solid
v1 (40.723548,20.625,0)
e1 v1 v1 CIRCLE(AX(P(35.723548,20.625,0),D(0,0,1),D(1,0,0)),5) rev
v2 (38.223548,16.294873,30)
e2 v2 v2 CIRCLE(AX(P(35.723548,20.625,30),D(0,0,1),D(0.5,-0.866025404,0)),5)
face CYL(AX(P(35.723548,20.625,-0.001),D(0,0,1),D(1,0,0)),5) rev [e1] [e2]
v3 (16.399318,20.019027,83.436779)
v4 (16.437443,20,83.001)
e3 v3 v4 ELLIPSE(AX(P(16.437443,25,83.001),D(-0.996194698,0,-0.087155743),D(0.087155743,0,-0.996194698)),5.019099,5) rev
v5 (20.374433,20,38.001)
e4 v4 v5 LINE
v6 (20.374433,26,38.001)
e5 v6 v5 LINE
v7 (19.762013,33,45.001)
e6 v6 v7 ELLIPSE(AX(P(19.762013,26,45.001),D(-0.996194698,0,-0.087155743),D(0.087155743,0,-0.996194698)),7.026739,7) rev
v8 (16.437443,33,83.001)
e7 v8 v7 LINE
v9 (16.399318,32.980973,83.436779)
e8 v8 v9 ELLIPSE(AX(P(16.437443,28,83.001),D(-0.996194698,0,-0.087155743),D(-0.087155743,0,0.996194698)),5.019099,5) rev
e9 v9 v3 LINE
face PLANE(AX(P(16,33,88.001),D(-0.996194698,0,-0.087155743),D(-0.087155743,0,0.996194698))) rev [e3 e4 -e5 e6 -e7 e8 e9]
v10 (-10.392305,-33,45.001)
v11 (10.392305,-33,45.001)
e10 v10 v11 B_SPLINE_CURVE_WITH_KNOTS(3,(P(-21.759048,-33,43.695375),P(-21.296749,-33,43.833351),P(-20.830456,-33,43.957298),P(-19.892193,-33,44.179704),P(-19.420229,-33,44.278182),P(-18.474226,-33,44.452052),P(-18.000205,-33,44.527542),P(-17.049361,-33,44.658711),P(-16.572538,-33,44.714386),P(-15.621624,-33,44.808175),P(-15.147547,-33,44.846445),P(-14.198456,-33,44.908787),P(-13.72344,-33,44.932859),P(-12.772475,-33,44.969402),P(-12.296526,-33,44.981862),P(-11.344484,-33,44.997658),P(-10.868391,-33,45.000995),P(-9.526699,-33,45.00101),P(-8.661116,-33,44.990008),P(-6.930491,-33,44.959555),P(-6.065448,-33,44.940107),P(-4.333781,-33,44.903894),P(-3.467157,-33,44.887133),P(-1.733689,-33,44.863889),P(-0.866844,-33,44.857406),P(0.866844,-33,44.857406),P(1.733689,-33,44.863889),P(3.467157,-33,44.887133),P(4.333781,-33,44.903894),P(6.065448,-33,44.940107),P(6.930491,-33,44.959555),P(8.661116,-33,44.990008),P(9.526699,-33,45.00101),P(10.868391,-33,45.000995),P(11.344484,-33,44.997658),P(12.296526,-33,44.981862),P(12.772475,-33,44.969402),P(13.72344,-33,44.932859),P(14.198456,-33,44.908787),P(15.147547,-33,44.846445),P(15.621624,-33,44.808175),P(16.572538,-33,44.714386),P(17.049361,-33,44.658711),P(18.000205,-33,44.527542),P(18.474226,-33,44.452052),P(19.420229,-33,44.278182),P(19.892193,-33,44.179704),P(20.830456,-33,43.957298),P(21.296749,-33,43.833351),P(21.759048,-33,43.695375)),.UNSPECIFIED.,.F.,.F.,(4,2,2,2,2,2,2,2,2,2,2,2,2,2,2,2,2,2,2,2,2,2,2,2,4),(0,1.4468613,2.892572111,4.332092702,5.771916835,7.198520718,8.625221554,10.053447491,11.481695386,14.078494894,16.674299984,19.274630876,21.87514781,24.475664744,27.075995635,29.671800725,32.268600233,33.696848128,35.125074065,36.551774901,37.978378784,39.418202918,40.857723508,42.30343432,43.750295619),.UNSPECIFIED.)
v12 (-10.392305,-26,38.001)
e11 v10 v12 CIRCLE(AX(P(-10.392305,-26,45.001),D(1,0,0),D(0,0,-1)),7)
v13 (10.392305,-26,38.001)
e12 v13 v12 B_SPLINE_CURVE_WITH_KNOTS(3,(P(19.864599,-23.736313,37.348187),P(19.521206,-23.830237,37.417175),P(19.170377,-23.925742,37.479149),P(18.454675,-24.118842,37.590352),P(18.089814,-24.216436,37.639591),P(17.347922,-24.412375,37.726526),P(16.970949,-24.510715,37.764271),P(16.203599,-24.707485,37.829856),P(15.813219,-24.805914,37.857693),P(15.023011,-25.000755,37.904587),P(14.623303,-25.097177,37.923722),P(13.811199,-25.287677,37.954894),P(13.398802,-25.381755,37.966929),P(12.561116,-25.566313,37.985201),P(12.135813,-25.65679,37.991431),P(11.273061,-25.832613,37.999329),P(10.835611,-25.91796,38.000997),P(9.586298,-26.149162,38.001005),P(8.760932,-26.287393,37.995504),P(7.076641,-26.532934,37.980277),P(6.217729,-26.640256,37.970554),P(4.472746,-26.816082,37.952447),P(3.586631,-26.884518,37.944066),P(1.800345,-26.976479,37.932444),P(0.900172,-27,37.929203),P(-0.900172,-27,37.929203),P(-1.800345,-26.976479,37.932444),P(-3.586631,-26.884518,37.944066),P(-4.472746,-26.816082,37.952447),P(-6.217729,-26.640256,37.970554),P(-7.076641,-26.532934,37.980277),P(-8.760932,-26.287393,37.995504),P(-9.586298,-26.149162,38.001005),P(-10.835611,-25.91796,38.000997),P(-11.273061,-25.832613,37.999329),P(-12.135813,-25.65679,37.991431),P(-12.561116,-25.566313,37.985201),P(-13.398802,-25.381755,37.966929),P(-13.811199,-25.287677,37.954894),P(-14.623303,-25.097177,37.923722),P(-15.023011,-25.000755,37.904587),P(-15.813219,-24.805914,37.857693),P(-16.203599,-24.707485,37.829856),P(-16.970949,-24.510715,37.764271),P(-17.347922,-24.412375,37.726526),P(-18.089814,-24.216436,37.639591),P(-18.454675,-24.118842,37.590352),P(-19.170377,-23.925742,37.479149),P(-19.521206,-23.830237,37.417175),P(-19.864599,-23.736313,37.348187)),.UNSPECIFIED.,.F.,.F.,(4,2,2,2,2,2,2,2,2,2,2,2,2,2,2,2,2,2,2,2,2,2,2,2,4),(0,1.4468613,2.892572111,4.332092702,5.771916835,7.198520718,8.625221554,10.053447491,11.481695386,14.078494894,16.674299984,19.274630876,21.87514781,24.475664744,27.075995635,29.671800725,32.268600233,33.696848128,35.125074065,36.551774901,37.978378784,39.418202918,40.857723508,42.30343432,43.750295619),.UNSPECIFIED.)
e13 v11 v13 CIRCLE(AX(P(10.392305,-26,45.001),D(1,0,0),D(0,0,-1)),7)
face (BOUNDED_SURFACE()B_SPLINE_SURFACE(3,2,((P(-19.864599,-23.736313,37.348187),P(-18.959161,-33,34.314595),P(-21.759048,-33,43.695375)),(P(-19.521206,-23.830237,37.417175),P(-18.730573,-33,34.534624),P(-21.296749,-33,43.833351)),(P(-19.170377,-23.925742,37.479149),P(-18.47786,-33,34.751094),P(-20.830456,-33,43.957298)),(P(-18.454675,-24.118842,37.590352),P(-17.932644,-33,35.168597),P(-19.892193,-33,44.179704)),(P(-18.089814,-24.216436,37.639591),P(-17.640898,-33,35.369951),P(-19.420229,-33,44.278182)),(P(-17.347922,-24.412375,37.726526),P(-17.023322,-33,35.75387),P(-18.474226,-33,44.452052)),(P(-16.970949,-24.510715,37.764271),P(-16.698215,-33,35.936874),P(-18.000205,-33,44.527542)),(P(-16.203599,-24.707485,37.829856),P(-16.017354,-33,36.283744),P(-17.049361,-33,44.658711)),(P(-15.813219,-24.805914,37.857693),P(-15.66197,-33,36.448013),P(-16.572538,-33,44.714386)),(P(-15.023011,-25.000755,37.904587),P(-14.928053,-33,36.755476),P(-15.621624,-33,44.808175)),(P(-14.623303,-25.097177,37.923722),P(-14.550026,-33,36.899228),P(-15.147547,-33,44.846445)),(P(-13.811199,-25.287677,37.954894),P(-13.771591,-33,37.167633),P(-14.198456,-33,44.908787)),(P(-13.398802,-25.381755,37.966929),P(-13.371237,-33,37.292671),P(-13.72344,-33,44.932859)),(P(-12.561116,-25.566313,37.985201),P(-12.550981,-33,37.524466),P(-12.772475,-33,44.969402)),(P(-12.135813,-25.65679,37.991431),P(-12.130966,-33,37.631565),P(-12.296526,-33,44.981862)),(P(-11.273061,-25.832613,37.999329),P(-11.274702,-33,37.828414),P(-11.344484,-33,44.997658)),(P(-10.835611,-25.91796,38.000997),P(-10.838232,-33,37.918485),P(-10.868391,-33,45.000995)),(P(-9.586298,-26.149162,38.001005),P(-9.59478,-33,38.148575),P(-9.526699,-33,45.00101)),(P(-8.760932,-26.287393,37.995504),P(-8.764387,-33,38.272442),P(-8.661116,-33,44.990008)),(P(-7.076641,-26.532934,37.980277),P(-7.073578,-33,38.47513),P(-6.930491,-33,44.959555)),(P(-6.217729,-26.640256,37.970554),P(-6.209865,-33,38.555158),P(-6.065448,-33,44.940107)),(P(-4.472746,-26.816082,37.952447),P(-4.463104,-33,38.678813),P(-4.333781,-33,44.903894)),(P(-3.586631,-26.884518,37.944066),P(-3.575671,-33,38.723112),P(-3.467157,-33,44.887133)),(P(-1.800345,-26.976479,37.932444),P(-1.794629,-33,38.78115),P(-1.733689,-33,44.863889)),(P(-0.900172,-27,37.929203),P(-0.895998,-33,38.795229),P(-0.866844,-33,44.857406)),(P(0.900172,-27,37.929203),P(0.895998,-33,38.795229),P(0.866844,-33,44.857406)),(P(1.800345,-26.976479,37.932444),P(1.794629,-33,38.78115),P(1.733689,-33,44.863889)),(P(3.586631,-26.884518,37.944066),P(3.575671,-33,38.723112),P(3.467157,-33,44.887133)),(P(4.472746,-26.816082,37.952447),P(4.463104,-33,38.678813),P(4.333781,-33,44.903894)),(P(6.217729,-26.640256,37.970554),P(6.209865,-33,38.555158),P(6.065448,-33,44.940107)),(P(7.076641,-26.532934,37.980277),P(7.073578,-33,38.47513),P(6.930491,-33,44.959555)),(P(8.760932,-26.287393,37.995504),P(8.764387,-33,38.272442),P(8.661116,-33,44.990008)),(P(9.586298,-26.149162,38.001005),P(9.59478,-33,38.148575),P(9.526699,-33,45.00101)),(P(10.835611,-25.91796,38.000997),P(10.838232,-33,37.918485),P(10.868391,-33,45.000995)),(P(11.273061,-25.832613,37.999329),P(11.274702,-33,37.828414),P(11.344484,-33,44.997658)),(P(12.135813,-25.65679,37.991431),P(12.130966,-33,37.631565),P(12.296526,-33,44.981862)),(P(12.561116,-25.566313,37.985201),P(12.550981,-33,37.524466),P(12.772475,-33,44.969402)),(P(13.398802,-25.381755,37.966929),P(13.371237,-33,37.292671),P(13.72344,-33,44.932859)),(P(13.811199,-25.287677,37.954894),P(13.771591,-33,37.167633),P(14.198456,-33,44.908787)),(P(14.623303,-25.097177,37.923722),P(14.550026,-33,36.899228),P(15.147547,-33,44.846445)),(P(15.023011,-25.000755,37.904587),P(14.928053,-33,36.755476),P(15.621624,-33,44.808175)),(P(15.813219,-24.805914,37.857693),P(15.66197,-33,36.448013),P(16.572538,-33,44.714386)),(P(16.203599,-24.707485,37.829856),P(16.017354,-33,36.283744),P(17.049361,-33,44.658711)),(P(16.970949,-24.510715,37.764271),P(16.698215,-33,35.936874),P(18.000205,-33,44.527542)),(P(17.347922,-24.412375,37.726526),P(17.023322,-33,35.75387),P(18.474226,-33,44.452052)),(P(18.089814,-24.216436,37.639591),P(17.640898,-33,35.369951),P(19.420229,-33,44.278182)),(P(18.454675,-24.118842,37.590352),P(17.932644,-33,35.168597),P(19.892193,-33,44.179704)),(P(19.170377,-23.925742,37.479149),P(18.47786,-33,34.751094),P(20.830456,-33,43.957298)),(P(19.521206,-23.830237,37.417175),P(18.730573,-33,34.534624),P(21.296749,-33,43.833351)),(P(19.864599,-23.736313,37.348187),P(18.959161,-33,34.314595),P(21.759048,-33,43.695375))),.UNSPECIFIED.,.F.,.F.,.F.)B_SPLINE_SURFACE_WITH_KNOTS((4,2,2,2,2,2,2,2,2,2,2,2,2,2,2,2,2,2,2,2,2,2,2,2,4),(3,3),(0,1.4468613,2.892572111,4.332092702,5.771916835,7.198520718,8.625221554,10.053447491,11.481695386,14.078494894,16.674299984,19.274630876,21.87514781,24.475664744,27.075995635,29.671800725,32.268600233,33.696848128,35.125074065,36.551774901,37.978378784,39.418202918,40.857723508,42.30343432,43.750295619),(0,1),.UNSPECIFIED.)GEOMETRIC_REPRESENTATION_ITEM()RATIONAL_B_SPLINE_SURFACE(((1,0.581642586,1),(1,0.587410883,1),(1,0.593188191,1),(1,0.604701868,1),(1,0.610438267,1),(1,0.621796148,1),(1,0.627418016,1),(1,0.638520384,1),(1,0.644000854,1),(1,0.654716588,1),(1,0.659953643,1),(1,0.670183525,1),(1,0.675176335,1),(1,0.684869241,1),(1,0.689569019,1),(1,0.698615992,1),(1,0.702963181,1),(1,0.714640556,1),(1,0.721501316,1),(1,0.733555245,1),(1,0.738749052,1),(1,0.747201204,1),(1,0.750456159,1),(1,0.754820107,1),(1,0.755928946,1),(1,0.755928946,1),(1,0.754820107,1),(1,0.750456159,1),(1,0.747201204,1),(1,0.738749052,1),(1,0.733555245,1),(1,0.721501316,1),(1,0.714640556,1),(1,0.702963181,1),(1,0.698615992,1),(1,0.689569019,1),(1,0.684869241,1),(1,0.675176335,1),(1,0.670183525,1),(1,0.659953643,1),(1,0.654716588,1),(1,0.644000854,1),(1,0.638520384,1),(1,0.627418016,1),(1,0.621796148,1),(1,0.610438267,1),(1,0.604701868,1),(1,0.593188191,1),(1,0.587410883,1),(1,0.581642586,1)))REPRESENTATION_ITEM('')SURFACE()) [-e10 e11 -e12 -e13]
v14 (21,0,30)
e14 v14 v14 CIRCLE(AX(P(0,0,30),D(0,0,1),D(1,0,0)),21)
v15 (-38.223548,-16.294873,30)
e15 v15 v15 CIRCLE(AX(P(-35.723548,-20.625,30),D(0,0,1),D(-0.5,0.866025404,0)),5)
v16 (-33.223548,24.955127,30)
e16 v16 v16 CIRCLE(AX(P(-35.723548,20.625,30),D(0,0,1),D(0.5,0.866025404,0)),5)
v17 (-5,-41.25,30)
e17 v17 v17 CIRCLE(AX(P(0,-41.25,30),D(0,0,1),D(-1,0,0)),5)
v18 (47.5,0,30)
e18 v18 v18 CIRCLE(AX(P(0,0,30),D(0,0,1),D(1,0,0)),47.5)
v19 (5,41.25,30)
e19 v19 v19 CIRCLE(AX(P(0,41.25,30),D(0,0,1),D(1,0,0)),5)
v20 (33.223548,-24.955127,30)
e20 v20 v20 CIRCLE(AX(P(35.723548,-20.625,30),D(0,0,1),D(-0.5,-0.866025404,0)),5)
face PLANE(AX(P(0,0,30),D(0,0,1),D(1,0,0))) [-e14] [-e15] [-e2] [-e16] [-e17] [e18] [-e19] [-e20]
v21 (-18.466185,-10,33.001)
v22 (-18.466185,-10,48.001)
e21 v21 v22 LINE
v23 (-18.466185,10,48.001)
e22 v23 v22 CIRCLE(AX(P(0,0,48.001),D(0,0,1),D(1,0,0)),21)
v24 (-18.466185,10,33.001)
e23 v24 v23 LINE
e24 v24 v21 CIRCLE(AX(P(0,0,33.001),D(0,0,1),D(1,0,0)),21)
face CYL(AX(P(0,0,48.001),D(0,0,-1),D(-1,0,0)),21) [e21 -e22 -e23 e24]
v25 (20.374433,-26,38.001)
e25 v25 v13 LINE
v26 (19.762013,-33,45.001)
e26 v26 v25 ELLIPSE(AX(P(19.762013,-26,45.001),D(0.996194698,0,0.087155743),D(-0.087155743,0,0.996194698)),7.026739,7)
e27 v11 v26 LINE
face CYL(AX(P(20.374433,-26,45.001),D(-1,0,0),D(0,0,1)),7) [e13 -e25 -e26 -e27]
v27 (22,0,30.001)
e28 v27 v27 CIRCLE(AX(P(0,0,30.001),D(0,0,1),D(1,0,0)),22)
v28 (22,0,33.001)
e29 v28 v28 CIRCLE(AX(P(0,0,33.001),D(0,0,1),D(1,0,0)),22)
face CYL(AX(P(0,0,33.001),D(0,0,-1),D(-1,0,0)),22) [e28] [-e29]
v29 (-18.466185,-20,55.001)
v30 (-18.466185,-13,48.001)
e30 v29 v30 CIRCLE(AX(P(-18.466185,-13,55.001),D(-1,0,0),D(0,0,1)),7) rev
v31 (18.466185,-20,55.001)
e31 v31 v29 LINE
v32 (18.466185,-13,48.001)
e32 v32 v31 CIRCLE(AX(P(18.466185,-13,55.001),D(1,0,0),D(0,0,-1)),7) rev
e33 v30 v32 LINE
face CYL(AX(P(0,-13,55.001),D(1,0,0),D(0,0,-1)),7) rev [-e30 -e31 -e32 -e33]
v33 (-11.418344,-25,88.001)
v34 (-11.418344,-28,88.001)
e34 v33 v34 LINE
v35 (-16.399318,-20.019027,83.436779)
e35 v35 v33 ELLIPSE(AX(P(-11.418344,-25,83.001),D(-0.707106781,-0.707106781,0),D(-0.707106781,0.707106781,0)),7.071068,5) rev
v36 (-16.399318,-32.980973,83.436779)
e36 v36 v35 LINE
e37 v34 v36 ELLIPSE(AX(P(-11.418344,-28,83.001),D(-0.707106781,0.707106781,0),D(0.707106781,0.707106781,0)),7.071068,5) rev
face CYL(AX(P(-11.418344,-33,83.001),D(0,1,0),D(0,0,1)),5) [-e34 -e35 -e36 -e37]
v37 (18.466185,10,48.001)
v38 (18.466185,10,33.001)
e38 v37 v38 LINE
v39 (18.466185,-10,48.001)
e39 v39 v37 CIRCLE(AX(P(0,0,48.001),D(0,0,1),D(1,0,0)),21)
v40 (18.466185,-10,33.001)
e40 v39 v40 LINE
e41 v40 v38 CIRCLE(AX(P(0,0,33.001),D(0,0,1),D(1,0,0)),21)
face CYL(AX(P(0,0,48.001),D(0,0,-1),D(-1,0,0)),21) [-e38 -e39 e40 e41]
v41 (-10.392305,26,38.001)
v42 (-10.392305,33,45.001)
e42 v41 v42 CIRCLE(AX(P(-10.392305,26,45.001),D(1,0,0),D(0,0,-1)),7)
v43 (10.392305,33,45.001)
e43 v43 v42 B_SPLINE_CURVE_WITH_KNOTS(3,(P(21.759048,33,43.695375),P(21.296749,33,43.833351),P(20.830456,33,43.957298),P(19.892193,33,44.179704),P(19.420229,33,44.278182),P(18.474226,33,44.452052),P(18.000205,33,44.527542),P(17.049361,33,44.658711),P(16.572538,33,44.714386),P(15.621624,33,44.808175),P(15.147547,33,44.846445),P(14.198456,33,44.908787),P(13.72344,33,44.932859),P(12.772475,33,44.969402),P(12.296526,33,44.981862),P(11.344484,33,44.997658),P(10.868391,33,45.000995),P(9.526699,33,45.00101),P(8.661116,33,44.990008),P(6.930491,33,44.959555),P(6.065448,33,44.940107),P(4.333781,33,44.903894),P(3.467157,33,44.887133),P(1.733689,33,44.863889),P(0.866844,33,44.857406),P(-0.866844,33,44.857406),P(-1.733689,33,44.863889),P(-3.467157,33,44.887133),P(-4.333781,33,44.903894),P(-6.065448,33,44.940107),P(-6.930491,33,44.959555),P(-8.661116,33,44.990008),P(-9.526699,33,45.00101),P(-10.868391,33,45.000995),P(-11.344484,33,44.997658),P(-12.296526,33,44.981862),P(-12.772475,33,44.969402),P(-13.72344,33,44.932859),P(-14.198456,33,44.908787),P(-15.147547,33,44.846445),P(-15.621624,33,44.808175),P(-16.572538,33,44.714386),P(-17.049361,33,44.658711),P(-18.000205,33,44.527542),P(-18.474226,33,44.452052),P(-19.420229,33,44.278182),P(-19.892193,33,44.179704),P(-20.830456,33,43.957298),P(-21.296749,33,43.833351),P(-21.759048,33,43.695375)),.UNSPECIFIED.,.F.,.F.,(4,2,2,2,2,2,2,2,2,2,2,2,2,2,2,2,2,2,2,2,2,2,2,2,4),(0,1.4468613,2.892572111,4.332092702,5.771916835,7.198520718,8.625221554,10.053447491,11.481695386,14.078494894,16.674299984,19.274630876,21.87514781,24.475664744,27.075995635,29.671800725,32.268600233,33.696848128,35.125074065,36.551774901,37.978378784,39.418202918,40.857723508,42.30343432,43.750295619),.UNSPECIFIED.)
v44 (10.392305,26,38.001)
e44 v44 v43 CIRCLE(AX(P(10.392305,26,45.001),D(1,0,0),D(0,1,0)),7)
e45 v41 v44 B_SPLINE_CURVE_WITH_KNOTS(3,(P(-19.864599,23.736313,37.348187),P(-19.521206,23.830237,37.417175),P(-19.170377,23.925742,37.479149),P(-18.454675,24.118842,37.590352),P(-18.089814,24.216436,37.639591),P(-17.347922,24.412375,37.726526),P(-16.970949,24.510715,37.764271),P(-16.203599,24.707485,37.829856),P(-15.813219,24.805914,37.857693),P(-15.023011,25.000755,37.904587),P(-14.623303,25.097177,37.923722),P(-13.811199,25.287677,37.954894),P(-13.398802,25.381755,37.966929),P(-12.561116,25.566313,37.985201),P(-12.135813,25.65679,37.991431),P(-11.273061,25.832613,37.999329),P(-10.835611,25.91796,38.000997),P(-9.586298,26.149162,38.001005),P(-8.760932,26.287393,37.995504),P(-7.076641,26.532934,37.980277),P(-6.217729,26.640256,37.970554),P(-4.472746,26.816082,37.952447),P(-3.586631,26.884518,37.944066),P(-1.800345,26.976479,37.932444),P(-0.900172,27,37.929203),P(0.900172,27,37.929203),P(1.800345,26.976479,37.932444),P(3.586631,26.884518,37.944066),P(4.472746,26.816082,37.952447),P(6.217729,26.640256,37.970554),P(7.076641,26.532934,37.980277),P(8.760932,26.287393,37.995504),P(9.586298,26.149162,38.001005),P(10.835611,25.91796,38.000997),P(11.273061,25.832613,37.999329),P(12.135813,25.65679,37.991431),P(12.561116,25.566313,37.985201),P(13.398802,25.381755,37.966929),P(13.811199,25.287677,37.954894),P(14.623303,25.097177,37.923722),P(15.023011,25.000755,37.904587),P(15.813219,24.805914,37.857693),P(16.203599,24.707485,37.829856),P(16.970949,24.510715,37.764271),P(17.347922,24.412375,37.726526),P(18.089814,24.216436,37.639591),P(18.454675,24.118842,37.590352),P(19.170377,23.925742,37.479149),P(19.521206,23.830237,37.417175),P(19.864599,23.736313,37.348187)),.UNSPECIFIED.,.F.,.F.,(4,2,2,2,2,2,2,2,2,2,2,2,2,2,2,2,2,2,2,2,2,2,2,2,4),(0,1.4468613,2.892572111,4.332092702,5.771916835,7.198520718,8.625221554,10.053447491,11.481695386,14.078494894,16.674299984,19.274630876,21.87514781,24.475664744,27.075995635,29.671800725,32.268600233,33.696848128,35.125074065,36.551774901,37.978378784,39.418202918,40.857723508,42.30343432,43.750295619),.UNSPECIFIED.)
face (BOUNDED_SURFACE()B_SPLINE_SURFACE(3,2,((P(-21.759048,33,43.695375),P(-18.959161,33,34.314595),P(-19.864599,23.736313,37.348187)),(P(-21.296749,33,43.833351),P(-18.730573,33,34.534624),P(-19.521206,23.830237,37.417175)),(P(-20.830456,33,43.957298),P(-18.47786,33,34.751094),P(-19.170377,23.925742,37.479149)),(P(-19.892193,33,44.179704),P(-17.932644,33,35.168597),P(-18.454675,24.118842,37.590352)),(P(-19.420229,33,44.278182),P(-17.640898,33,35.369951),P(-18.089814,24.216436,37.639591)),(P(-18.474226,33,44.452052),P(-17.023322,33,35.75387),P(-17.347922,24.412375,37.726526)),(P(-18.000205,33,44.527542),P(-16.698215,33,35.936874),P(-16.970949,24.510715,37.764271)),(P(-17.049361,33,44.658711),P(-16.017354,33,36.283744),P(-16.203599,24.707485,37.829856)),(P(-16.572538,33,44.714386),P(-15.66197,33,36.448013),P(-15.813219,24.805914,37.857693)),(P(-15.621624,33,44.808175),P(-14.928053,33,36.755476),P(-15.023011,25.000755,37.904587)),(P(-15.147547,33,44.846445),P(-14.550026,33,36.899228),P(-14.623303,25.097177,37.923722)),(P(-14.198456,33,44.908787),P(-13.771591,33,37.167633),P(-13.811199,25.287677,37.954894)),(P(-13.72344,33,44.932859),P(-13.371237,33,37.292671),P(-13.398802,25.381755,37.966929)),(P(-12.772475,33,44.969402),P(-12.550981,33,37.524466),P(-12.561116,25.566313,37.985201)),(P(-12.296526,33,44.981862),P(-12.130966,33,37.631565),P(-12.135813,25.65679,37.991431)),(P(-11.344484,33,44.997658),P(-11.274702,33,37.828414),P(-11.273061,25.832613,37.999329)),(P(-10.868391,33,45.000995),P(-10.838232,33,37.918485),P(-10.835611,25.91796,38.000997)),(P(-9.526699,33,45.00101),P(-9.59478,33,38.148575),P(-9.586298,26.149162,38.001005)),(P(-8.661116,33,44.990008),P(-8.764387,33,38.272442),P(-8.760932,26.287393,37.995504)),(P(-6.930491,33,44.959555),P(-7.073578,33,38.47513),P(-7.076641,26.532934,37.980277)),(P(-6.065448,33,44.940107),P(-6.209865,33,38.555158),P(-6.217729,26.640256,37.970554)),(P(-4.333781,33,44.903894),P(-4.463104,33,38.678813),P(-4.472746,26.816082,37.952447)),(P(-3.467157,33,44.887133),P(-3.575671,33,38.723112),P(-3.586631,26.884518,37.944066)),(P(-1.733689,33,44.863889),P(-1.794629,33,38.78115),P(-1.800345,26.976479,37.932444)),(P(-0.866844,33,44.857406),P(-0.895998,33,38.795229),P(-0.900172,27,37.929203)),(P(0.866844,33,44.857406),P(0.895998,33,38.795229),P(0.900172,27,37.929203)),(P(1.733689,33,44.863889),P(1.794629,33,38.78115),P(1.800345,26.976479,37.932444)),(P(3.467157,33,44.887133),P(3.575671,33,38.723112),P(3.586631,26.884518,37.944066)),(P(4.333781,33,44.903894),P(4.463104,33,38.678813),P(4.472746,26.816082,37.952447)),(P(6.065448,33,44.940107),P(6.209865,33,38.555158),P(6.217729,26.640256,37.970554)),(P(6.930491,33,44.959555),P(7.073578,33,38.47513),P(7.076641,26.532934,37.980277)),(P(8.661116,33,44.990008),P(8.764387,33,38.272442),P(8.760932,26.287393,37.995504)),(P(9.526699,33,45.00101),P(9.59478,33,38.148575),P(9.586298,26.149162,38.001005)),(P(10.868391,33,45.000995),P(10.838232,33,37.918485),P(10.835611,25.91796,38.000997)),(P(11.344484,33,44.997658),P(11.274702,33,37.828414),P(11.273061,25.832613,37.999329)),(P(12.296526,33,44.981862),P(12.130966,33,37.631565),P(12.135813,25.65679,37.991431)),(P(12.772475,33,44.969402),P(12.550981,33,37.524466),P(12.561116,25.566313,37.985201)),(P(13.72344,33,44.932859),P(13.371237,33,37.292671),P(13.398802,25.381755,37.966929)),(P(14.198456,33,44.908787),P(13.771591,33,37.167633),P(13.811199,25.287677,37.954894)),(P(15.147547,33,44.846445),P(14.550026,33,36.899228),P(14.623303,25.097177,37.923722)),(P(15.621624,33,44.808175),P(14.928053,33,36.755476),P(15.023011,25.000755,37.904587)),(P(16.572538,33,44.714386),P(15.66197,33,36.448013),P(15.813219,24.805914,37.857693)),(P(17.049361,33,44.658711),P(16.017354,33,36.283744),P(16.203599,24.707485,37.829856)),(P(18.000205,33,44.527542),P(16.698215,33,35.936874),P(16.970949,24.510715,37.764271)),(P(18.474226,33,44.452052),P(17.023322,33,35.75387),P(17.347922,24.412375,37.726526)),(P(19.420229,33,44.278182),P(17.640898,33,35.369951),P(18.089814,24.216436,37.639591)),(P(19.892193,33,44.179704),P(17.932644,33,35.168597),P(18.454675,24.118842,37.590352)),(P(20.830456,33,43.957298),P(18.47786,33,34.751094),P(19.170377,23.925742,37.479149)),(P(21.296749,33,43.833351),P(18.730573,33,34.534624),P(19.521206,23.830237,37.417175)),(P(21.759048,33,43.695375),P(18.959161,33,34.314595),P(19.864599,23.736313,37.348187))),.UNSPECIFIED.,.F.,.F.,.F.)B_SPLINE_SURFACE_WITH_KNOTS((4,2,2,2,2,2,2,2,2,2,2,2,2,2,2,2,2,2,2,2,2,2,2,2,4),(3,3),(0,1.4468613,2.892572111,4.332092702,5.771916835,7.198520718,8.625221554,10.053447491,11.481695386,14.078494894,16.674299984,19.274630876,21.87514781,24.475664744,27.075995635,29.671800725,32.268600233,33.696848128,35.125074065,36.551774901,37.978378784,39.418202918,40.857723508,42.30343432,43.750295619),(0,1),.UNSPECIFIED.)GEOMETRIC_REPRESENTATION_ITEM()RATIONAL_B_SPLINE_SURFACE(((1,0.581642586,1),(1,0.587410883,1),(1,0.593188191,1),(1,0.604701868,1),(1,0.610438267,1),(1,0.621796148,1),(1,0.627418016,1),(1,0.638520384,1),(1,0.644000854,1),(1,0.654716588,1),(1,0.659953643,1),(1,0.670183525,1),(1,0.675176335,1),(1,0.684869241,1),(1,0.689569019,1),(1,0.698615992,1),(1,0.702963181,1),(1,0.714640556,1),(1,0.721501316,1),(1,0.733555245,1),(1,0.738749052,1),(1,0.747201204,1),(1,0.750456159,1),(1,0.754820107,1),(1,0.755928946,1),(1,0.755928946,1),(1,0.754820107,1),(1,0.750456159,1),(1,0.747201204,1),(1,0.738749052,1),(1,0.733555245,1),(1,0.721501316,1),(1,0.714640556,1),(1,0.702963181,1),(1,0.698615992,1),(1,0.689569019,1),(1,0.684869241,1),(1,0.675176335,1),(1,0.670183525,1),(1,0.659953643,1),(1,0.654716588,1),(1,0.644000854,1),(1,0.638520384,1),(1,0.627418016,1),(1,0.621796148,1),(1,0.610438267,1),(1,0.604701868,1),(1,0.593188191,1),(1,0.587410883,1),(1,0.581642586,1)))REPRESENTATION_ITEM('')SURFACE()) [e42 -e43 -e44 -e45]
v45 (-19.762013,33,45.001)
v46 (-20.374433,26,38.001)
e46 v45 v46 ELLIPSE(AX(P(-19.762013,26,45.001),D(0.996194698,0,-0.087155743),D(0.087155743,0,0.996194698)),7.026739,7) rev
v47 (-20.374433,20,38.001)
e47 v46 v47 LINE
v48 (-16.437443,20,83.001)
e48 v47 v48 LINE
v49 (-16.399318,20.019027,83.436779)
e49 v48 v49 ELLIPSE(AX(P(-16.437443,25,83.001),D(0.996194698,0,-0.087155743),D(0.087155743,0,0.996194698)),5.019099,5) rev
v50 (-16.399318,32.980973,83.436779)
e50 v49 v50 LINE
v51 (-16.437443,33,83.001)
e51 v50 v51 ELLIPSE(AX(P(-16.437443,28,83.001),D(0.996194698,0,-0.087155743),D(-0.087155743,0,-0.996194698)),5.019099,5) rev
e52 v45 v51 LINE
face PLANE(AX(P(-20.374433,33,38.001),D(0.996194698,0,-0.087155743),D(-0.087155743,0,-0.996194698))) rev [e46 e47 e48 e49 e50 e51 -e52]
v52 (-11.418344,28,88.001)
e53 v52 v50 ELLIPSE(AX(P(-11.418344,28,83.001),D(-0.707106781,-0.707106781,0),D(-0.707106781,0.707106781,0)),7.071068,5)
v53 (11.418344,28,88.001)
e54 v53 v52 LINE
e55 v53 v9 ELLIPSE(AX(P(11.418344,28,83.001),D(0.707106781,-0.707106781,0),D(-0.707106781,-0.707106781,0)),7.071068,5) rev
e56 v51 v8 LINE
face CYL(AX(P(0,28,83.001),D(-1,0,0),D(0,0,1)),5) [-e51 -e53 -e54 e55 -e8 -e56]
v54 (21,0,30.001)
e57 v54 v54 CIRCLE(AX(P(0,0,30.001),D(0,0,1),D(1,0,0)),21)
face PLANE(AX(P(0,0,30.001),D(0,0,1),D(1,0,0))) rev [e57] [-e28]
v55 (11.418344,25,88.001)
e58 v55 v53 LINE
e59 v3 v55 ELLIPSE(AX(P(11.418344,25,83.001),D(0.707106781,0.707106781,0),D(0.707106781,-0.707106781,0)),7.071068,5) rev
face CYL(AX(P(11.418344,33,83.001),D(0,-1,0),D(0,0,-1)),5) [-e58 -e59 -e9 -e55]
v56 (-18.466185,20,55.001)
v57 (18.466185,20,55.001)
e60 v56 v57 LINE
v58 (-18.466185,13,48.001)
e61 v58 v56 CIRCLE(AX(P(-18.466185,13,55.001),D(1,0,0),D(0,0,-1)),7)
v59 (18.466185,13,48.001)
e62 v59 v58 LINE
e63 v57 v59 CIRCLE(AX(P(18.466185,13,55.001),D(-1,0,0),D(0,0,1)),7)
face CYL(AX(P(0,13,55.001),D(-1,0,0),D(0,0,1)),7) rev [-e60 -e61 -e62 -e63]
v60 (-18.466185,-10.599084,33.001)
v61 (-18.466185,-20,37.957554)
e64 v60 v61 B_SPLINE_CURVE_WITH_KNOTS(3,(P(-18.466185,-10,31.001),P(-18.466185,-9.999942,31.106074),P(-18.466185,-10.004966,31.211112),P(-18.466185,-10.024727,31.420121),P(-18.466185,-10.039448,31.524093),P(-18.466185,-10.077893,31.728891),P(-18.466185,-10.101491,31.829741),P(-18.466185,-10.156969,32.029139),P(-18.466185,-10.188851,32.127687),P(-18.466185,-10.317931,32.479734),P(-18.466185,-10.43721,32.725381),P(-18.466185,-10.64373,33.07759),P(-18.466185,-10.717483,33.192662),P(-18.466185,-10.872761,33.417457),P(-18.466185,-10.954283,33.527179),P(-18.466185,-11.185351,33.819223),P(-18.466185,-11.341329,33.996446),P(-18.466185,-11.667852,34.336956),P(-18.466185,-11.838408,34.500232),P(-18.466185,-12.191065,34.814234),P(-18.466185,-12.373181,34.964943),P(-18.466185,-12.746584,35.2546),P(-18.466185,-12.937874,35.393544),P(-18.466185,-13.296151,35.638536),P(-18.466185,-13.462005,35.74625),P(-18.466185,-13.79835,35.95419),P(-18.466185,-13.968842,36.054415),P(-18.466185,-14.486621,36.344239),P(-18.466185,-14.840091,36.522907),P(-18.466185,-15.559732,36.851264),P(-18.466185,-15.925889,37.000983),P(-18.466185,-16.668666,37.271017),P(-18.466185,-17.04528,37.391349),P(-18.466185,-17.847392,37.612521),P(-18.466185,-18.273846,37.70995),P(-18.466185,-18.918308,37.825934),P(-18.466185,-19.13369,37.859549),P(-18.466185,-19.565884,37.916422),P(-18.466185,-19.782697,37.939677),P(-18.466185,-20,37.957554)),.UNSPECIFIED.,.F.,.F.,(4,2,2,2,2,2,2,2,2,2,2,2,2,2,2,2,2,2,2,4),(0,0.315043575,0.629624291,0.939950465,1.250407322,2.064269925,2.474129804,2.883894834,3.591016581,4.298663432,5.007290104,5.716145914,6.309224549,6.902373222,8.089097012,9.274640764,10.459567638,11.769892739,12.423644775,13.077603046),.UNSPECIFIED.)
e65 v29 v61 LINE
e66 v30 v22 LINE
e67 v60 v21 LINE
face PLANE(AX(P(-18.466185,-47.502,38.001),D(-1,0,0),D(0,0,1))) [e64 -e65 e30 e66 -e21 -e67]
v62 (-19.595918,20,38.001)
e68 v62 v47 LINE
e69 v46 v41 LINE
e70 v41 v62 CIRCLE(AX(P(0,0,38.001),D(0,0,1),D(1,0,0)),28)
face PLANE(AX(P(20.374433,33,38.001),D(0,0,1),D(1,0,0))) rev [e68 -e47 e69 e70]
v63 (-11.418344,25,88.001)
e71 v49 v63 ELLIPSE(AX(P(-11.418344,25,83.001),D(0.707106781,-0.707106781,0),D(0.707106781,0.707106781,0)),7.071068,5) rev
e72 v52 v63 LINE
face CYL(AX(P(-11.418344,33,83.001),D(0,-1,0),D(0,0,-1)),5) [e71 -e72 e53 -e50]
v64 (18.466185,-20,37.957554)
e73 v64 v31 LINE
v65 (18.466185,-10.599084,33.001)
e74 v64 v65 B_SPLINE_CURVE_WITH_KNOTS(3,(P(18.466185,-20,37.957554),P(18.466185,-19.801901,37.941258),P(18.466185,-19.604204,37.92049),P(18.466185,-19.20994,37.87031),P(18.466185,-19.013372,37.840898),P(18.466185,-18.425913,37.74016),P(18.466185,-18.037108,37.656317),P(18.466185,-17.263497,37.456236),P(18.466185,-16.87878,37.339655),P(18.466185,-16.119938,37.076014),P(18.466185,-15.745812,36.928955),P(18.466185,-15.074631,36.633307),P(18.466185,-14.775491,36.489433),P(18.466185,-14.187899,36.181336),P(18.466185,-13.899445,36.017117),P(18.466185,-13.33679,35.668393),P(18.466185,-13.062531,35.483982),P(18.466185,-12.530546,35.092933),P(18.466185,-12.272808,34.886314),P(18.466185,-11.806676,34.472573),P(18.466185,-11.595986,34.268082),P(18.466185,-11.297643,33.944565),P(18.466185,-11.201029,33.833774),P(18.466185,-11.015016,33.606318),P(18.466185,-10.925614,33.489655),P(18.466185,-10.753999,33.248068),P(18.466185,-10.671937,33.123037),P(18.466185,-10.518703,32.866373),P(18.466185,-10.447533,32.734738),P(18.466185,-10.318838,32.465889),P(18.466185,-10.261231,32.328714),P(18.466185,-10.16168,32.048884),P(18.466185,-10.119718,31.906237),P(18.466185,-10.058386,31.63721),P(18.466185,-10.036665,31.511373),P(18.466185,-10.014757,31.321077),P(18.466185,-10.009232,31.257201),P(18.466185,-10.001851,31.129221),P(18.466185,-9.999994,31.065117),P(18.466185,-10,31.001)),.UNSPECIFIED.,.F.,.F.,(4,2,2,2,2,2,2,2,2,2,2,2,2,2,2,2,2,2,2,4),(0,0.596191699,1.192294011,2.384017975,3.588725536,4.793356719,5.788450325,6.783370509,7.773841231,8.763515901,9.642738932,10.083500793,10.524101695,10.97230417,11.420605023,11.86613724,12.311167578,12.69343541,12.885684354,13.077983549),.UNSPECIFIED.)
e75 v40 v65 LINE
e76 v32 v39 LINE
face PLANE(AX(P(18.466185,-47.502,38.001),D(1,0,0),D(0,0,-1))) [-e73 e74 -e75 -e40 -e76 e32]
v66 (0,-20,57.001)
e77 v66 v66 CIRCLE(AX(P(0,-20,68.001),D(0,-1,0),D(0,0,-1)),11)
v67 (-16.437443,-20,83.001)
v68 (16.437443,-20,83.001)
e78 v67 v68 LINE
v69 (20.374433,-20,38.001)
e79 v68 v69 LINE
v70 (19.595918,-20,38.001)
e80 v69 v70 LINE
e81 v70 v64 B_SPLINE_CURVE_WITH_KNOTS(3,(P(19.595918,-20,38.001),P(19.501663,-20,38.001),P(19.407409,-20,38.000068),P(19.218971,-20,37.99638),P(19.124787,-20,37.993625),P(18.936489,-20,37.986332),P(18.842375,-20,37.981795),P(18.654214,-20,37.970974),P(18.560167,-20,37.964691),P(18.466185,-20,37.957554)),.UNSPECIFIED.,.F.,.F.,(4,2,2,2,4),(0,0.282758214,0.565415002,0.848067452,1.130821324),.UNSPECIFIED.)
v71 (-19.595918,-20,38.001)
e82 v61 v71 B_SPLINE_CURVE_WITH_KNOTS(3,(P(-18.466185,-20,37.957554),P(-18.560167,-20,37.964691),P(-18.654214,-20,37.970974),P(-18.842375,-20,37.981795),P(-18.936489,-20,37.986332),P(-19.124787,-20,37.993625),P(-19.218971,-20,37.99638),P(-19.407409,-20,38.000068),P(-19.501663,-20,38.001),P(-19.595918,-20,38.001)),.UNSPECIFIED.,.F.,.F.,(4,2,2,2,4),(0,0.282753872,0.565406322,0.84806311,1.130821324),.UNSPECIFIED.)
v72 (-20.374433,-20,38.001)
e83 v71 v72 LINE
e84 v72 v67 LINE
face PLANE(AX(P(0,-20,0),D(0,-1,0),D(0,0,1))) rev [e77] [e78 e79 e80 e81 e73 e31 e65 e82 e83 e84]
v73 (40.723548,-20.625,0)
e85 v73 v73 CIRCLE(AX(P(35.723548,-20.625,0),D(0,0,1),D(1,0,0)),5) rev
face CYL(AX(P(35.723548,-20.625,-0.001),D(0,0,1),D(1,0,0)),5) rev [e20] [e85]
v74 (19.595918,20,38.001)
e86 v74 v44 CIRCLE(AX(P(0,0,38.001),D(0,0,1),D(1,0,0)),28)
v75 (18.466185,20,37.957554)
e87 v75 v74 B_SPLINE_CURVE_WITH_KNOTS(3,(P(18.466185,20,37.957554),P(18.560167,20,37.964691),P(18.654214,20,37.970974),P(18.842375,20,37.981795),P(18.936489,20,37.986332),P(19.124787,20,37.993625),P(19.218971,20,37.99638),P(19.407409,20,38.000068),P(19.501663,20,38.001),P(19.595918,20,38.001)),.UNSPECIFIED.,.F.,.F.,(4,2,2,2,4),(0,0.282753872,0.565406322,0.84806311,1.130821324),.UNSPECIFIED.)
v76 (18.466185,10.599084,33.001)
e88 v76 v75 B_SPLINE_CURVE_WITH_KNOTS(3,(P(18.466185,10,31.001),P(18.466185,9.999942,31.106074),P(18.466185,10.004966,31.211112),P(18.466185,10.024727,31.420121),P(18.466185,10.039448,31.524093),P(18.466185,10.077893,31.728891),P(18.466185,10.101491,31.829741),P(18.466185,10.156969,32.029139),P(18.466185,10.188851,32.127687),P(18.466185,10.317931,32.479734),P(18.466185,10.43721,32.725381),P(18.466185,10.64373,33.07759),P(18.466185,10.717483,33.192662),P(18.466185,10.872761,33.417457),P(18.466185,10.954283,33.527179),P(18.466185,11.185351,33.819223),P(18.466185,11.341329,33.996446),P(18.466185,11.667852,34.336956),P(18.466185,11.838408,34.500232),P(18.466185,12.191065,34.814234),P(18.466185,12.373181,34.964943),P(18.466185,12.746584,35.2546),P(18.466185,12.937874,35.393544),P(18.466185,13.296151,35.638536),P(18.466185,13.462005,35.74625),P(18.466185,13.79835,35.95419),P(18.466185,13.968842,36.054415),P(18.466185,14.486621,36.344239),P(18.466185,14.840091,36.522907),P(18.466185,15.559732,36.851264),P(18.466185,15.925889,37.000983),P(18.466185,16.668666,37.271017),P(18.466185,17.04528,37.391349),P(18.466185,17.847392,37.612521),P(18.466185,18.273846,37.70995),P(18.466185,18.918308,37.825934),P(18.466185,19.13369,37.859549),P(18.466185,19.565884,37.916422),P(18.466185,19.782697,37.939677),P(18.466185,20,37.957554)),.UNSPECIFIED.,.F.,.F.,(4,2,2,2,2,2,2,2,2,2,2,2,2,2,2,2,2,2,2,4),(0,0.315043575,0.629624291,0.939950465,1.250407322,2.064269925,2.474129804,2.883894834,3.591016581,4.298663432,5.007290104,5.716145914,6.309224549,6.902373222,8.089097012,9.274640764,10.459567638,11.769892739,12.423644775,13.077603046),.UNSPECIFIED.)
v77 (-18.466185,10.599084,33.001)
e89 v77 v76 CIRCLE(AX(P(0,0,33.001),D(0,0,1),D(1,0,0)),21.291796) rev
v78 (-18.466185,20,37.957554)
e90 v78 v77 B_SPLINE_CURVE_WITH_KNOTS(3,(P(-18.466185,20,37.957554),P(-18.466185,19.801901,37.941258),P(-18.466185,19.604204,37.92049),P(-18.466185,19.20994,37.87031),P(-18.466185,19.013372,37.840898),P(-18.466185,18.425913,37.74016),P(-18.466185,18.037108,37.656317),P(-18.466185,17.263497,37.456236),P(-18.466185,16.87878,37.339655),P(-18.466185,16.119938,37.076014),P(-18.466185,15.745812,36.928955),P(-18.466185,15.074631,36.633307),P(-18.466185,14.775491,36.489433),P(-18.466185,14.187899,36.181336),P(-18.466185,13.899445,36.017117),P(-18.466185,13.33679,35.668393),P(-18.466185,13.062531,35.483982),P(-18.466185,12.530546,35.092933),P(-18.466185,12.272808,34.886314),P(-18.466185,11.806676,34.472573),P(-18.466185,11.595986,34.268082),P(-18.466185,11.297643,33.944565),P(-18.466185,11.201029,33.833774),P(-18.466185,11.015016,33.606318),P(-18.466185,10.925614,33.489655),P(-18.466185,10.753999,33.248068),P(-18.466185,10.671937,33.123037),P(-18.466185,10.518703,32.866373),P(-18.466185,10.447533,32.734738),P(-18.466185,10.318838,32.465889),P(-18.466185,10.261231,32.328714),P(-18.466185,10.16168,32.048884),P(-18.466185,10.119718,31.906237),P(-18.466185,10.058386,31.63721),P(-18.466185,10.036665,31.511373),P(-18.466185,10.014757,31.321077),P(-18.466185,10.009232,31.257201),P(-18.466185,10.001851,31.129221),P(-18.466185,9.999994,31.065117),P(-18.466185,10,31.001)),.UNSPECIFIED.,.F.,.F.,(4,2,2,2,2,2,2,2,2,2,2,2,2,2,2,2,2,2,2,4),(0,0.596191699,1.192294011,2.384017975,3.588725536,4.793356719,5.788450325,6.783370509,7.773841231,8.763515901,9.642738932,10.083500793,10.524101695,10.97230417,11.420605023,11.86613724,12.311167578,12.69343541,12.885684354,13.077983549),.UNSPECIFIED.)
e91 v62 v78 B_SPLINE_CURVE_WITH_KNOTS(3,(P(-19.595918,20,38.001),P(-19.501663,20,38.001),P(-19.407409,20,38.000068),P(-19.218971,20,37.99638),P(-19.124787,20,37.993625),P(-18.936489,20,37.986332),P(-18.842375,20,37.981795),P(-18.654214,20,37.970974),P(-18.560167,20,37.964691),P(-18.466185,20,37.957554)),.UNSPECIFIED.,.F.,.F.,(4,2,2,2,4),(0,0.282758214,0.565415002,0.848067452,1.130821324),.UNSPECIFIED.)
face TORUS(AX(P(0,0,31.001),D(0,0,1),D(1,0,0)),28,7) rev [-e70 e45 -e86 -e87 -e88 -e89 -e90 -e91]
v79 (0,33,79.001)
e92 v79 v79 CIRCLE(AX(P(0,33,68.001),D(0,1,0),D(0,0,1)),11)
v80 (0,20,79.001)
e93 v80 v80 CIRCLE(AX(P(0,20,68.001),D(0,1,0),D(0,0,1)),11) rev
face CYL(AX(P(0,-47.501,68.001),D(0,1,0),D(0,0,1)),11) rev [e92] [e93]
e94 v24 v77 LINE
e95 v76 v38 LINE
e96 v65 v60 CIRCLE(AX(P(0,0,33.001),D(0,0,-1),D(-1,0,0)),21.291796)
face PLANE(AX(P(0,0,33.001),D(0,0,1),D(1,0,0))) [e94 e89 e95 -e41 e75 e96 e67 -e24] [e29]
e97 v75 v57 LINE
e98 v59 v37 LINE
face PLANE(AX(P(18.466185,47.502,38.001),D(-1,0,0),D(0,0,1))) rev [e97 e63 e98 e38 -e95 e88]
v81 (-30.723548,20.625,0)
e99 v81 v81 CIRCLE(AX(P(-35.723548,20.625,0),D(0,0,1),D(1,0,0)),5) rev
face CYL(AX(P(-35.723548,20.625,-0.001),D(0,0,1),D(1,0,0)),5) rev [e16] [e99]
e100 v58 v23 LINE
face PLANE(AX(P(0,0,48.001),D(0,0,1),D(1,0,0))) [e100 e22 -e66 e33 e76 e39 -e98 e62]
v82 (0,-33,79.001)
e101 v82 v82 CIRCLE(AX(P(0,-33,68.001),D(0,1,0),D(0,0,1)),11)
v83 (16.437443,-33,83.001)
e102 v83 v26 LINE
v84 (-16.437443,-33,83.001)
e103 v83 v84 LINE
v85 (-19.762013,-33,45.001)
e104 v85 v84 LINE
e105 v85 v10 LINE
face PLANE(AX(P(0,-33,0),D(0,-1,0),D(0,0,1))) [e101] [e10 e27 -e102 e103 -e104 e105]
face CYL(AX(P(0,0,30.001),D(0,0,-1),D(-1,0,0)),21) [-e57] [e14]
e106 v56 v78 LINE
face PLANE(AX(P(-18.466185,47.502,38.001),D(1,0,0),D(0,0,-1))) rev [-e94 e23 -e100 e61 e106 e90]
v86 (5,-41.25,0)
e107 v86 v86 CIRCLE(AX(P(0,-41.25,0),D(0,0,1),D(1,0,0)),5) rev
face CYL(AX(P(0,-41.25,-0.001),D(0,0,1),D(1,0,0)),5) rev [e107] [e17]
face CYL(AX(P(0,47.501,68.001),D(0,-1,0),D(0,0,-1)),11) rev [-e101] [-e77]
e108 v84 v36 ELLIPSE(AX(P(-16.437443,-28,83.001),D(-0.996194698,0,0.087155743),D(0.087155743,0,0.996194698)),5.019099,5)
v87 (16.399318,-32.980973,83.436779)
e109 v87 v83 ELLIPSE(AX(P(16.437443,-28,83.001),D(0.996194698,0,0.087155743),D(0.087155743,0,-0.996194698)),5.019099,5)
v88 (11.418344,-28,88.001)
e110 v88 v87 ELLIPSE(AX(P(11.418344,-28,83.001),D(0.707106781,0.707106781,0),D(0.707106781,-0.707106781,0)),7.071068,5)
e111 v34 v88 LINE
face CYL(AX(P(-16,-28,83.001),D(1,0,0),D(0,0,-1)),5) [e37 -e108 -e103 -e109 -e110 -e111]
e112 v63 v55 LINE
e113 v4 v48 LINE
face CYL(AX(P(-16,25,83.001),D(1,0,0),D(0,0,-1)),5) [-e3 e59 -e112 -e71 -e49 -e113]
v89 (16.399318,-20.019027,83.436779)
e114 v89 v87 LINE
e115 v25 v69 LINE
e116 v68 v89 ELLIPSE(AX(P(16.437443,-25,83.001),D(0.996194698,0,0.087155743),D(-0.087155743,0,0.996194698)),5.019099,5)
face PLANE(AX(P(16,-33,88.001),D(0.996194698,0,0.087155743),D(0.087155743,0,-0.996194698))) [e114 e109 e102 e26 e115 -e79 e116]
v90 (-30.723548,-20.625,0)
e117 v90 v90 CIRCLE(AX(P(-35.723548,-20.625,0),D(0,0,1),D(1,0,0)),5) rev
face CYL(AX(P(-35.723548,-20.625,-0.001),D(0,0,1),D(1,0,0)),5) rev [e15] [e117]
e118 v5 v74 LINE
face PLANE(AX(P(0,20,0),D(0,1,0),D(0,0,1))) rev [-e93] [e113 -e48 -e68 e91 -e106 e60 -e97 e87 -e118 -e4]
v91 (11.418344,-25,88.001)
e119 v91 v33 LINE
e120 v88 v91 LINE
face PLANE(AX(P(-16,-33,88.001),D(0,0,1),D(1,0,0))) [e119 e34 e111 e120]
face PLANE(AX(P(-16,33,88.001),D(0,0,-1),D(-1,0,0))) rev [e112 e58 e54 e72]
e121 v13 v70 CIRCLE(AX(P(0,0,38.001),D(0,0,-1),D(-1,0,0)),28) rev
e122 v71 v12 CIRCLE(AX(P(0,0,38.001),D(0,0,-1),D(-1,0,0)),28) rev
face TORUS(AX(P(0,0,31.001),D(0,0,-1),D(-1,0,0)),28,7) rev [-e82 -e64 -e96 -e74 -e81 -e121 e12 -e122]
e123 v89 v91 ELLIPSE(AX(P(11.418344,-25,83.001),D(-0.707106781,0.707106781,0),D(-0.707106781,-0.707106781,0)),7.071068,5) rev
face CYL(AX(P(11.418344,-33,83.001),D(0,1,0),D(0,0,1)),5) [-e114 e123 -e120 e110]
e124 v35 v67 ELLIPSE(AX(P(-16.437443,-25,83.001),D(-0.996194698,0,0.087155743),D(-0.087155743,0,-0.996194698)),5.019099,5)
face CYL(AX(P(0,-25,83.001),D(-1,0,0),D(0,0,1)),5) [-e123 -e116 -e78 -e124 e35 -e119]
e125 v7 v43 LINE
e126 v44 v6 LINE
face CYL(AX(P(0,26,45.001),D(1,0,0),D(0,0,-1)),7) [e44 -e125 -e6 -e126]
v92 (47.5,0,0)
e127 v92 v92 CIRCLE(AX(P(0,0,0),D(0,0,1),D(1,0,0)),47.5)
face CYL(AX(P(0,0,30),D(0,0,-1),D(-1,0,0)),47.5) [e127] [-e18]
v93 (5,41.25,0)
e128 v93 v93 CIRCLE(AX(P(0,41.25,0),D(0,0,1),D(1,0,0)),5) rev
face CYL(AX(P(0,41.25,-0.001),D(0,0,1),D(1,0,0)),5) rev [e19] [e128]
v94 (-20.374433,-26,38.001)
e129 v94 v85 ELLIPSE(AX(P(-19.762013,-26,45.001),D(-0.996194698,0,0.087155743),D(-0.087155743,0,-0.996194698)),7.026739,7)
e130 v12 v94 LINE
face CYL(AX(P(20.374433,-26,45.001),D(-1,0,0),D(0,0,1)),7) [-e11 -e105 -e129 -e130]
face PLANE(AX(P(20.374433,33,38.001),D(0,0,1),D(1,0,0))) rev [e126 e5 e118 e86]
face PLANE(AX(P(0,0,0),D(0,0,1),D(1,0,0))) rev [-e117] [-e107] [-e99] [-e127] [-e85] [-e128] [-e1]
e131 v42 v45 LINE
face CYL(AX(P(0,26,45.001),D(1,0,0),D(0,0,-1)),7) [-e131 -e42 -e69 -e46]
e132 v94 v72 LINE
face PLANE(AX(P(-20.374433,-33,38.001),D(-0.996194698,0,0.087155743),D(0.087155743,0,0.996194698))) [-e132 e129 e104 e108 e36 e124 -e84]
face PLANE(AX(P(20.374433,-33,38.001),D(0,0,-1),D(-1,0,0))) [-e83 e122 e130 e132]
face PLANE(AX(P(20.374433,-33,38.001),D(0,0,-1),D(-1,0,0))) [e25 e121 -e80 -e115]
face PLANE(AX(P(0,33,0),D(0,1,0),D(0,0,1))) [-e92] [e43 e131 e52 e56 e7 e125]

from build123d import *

# Parameters (mm, degrees)
SZKIC1_R                    = 47.5
DODANIE_WYCI_GNI_CIE1_DEPTH = 30
WYTNIJ_WYCI_GNI_CIE1_REACH  = 75.57
SZKIC2_R                    = 5
SZYK_KO_OWY1_COUNT          = 6
SZKIC3_R                    = 21
DODANIE_WYCI_GNI_CIE2_DEPTH = 0.001
SZKIC5_R                    = 22
DODANIE_WYCI_GNI_CIE4_DEPTH = 3
SZKIC7_R                    = 21
DODANIE_WYCI_GNI_CIE5_DEPTH = 15
DODANIE_WYCI_GNI_CIE6_DEPTH = 6.5
SZKIC14_W                   = 36.932370626
SZKIC14_H                   = 10
DODANIE_WYCI_GNI_CIE7_DEPTH = 10
ZAOKR_GLENIE1_R             = 7
ZAOKR_GLENIE2_R             = 7
ZAOKR_GLENIE3_R             = 5
WYTNIJ_WYCI_GNI_CIE2_REACH  = 130.377
SZKIC16_R                   = 11


# Read off the part's stored shape, not the designer's step: Lustro1
with BuildPart() as part:
    # Szkic1 → Dodanie-wyciągnięcie1 (new body)
    with BuildSketch(Plane.XY):
        Circle(SZKIC1_R)
    extrude(amount=DODANIE_WYCI_GNI_CIE1_DEPTH)

    # Szkic2 → Wytnij-wyciągnięcie1 (cut, up to next)
    with BuildSketch(Plane.XY.offset(30), mode=Mode.PRIVATE) as wytnij_wyci_gni_cie1_sk1:
        with Locations((0, 41.25)):
            Circle(SZKIC2_R)
    wytnij_wyci_gni_cie1_tool1 = extrude(wytnij_wyci_gni_cie1_sk1.sketch, amount=-WYTNIJ_WYCI_GNI_CIE1_REACH, mode=Mode.PRIVATE) & part.part
    wytnij_wyci_gni_cie1 = wytnij_wyci_gni_cie1_tool1.solids().sort_by_distance((0, 41.25, 30))[0]
    add(wytnij_wyci_gni_cie1, mode=Mode.SUBTRACT)

    # Szyk kołowy1: Wytnij-wyciągnięcie1 ×6 about axis
    szyk_ko_owy1_axis = Axis((0, 0, 0), (0, 0, 1))
    for i in range(1, SZYK_KO_OWY1_COUNT):
        add(wytnij_wyci_gni_cie1.rotate(szyk_ko_owy1_axis, i * 360 / SZYK_KO_OWY1_COUNT), mode=Mode.SUBTRACT)

    # Szkic3 → Dodanie-wyciągnięcie2 (add)
    with BuildSketch(Plane.XY.offset(30)):
        Circle(SZKIC3_R)
    extrude(amount=DODANIE_WYCI_GNI_CIE2_DEPTH)

    # Szkic5 → Dodanie-wyciągnięcie4 (add)
    with BuildSketch(Plane.XY.offset(30.001)):
        Circle(SZKIC5_R)
    extrude(amount=DODANIE_WYCI_GNI_CIE4_DEPTH)

    # Szkic7 → Dodanie-wyciągnięcie5 (add)
    with BuildSketch(Plane.XY.offset(33.001)):
        Circle(SZKIC7_R)
    extrude(amount=DODANIE_WYCI_GNI_CIE5_DEPTH)

    # Szkic9 → Dodanie-wyciągnięcie6 (add, symmetric)
    with BuildSketch(Plane(origin=(0, 26.5, 0), x_dir=(1, 0, 0), z_dir=(0, 1, 0))):
        Polygon((-20.374433176, -38.001), (-16, -88.001), (16, -88.001), (20.374433176, -38.001), align=None)
    extrude(amount=DODANIE_WYCI_GNI_CIE6_DEPTH, both=True)

    # Szkic14 → Dodanie-wyciągnięcie7 (add)
    with BuildSketch(Plane(origin=(0, 10, 0), x_dir=(1, 0, 0), z_dir=(0, 1, 0))):
        with Locations((0, -43.001)):
            Rectangle(SZKIC14_W, SZKIC14_H)
    extrude(amount=DODANIE_WYCI_GNI_CIE7_DEPTH)

    # Zaokrąglenie1
    # the kernel refuses this fillet: 7 mm, written as the material it adds along each edge
    with BuildSketch(Plane(origin=(0, 0, 38.001), x_dir=(-0.9435381877974668, -0.33126377430662785, 0), z_dir=(0.33126377430662785, -0.9435381877974668, 0))) as zaokr_glenie1_piece_1_section:
        with BuildLine():
            CenterArc((21 + ZAOKR_GLENIE1_R, ZAOKR_GLENIE1_R), ZAOKR_GLENIE1_R, 180, 90)
            Line((21 + ZAOKR_GLENIE1_R, 0), (21, 0))
            Line((21, 0), (21, ZAOKR_GLENIE1_R))
        make_face()
    zaokr_glenie1_piece_1 = revolve(axis=Axis((0, 0, 38.001), (0, 0, -1)), revolution_arc=218.690998802, mode=Mode.PRIVATE)
    zaokr_glenie1_piece_1 = split(zaokr_glenie1_piece_1, bisect_by=Plane(origin=(-18.694483681, 20, 37.992305912), z_dir=(0, 1, 0)), keep=Keep.TOP, mode=Mode.PRIVATE)
    add(zaokr_glenie1_piece_1)
    with BuildSketch(Plane(origin=(0, 0, 38.001), x_dir=(-0.9435381877974668, -0.33126377430662785, 0), z_dir=(0.33126377430662785, -0.9435381877974668, 0))) as zaokr_glenie1_piece_2_section:
        with BuildLine():
            CenterArc((21 + ZAOKR_GLENIE1_R, ZAOKR_GLENIE1_R), ZAOKR_GLENIE1_R, 180, 90)
            Line((21 + ZAOKR_GLENIE1_R, 0), (21, 0))
            Line((21, 0), (21, ZAOKR_GLENIE1_R))
        make_face()
    zaokr_glenie1_piece_2 = revolve(axis=Axis((0, 0, 38.001), (0, 0, -1)), revolution_arc=218.690998802, mode=Mode.PRIVATE)
    zaokr_glenie1_piece_2 = split(zaokr_glenie1_piece_2, bisect_by=Plane(origin=(-18.466185313, 16.543060956, 36.276393693), z_dir=(1, 0, 0)), keep=Keep.TOP, mode=Mode.PRIVATE)
    zaokr_glenie1_piece_2 = split(zaokr_glenie1_piece_2, bisect_by=Plane(origin=(18.466185313, 16.543060956, 36.276393693), z_dir=(-1, 0, 0)), keep=Keep.TOP, mode=Mode.PRIVATE)
    add(zaokr_glenie1_piece_2)
    with BuildSketch(Plane(origin=(18.466185313, 20, 48.001), x_dir=(0, 0, 1), z_dir=(-1, 0, 0))) as zaokr_glenie1_piece_3:
        with BuildLine():
            CenterArc((ZAOKR_GLENIE1_R, -ZAOKR_GLENIE1_R), ZAOKR_GLENIE1_R, 90, 90)
            Line((0, -ZAOKR_GLENIE1_R), (0, 0))
            Line((0, 0), (ZAOKR_GLENIE1_R, 0))
        make_face()
    extrude(amount=36.932370625)

    # Zaokrąglenie2
    zaokr_glenie2_edges = [part.edges().sort_by_distance(p)[0] for p in [
        (0, 33, 38.001),
    ]]
    fillet(zaokr_glenie2_edges, radius=ZAOKR_GLENIE2_R)

    # Zaokrąglenie3
    zaokr_glenie3_edges = [part.edges().sort_by_distance(p)[0] for p in [
        (0, 20, 88.001),
        (-16, 26.5, 88.001),
        (16, 26.5, 88.001),
        (0, 33, 88.001),
    ]]
    fillet(zaokr_glenie3_edges, radius=ZAOKR_GLENIE3_R)

    # Szkic16 → Wytnij-wyciągnięcie2 (cut, up to next)
    with BuildSketch(Plane(origin=(0, 33, 0), x_dir=(1, 0, 0), z_dir=(0, 1, 0)), mode=Mode.PRIVATE) as wytnij_wyci_gni_cie2_sk1:
        with Locations(Location((0, -68.001, 0), (0, 0, 270))):
            Circle(SZKIC16_R)
    wytnij_wyci_gni_cie2_tool1 = extrude(wytnij_wyci_gni_cie2_sk1.sketch, amount=-WYTNIJ_WYCI_GNI_CIE2_REACH, mode=Mode.PRIVATE) & part.part
    add(wytnij_wyci_gni_cie2_tool1.solids().sort_by_distance((0, 33, 68.001))[0], mode=Mode.SUBTRACT)

    # Lustro1: part across plane


with BuildPart() as part_1:
    add(part.part)
    add(part.part.mirror(Plane.ZX))


solid = part_1.part
